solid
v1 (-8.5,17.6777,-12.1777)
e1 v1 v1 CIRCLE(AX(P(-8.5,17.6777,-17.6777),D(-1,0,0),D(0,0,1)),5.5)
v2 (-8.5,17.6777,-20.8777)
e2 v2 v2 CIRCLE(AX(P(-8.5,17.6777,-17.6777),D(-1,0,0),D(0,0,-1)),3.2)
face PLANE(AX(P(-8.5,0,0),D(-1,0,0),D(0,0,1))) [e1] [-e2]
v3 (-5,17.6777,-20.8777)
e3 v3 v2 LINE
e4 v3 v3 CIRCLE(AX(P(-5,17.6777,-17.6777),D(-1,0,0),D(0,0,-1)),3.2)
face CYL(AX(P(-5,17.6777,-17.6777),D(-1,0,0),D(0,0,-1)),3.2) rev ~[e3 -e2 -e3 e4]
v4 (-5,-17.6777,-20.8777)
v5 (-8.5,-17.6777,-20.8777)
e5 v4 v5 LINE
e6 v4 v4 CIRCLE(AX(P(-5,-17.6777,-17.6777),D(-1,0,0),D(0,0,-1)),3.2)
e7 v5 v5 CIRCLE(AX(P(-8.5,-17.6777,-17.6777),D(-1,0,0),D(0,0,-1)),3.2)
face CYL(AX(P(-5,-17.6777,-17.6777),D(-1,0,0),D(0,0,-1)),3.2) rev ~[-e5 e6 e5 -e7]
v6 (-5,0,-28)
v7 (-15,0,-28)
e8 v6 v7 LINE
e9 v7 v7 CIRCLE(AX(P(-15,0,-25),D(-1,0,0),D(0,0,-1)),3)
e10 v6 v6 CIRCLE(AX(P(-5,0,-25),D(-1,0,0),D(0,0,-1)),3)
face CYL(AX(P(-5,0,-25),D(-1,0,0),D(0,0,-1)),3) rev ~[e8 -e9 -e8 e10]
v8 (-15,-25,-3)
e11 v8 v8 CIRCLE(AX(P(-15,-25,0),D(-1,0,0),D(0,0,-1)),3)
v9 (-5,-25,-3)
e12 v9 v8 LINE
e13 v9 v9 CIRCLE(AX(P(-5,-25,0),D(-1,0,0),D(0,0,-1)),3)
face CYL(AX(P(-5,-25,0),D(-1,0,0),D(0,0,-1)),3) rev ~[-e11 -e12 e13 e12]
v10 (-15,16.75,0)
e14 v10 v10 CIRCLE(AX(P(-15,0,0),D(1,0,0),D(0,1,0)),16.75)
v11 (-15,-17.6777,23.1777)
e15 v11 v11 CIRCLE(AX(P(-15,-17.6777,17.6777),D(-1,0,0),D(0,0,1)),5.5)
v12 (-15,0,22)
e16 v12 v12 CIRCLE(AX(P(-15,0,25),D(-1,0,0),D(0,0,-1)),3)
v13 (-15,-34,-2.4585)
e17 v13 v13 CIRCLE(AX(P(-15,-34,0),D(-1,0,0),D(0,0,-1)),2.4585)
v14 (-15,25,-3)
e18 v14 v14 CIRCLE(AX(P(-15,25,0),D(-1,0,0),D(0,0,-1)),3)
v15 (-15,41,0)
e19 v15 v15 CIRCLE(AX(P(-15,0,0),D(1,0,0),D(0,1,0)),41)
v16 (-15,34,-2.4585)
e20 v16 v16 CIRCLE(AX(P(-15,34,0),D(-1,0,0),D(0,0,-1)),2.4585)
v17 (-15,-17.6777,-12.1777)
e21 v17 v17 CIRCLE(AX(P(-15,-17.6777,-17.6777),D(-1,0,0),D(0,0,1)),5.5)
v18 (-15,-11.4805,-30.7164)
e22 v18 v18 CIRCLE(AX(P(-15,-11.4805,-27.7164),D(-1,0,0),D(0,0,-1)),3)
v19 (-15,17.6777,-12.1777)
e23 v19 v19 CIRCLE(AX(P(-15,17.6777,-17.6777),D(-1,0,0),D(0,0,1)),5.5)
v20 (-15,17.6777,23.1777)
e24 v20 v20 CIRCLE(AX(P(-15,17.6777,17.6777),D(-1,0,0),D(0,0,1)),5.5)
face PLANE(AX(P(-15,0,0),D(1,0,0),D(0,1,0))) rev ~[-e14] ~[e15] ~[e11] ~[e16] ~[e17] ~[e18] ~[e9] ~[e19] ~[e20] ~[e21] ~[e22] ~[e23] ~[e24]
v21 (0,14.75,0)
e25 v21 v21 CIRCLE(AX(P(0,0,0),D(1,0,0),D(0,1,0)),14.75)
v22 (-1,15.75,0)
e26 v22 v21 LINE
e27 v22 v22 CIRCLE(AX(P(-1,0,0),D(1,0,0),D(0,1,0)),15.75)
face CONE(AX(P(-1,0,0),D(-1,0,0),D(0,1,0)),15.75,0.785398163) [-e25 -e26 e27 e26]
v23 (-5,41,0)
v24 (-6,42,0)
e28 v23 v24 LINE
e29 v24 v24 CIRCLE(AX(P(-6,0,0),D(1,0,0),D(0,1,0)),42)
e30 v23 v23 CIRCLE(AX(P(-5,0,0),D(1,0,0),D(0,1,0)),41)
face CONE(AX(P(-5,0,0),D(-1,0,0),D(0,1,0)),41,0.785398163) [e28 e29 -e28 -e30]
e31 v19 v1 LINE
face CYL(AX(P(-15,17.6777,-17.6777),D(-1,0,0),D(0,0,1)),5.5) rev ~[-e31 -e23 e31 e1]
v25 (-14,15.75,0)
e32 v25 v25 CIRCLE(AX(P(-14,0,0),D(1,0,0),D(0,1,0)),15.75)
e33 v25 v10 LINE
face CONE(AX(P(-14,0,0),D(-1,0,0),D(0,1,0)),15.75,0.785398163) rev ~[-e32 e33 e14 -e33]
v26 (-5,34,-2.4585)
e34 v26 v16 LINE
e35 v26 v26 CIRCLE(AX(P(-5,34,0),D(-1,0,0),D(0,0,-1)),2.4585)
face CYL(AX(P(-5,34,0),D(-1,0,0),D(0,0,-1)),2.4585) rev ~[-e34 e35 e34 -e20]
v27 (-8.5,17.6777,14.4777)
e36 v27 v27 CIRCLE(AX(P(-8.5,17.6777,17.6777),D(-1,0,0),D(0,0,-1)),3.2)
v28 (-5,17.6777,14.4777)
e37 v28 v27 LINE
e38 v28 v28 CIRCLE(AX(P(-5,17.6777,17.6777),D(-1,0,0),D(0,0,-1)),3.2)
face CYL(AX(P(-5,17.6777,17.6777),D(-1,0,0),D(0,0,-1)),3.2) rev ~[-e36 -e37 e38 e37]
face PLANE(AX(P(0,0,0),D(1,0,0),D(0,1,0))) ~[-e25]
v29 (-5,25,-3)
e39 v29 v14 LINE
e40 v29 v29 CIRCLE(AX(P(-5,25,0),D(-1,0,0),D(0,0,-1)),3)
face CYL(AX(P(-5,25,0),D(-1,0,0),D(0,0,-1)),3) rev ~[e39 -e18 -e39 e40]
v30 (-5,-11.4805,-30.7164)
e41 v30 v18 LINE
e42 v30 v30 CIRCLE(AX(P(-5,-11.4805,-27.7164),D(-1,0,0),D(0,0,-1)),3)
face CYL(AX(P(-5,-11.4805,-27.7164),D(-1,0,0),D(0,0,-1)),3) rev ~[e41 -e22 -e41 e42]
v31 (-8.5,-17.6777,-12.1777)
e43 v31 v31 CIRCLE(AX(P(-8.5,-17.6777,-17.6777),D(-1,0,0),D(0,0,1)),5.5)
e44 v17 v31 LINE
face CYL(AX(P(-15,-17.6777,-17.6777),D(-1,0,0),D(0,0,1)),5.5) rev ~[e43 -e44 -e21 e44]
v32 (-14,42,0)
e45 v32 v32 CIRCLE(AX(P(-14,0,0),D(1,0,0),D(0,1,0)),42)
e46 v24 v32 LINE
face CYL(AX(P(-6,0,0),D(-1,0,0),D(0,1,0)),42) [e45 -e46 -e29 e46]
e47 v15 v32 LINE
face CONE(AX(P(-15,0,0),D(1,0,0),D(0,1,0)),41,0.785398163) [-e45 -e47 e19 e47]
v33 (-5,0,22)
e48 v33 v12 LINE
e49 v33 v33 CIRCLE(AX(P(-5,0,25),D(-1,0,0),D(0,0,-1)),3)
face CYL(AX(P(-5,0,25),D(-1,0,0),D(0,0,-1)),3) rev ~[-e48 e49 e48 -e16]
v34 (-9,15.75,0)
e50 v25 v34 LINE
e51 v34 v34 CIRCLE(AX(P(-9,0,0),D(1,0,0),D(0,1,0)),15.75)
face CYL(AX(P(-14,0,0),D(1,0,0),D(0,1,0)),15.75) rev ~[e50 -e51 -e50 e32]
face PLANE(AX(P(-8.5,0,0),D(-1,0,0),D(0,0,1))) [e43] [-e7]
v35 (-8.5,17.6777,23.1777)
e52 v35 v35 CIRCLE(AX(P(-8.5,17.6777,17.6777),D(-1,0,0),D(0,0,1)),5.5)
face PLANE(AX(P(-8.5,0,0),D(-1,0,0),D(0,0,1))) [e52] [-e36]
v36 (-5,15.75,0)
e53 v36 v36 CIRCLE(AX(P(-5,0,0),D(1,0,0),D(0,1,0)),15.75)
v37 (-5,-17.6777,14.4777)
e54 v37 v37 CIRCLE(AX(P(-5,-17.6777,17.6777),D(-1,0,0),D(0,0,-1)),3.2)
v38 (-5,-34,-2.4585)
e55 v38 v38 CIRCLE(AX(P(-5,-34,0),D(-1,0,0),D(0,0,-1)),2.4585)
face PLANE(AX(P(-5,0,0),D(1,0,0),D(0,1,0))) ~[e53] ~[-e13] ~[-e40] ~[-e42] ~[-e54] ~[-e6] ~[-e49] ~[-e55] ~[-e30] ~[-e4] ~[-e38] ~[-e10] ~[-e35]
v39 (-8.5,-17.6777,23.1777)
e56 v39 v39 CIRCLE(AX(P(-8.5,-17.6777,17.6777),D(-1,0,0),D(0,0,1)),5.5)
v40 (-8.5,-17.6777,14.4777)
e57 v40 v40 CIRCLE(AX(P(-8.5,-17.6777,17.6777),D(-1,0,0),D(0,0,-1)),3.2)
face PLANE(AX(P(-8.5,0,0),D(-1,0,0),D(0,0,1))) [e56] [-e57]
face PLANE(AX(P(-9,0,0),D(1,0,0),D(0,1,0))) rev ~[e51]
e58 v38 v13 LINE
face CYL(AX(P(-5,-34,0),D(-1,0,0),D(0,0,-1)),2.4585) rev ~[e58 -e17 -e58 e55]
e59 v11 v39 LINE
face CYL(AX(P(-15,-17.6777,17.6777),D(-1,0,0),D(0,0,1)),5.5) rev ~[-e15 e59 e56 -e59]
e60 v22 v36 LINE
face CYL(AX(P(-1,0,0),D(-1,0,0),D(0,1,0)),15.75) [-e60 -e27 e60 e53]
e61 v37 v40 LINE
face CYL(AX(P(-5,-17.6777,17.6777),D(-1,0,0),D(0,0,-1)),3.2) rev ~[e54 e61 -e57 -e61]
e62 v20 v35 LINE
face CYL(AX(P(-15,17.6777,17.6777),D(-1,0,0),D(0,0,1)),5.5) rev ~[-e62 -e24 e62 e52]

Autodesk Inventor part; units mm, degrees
ref_plane "YZ Plane" through (0, 0, 0) normal (1, 0, 0) x (0, 1, 0)
ref_plane "XZ Plane" through (0, 0, 0) normal (0, 1, 0) x (-1, 0, 0)
ref_plane "XY Plane" through (0, 0, 0) normal (0, 0, 1) x (1, 0, 0)
sketch "Sketch1" plane through (0, 0, 0) normal (0, 0, 1) x (1, 0, 0)
  line L0 (-15, 41) -> (-15, 16.75)
  line L1 (-14, 15.75) -> (-9, 15.75)
  line L2 (-9, 15.75) -> (-9, 0)
  line L3 (-9, 0) -> (0, 0)
  line L4 (0, 0) -> (0, 14.75)
  line L5 (-1, 15.75) -> (-5, 15.75)
  line L6 (-5, 15.75) -> (-5, 41)
  line L7 (-6, 42) -> (-14, 42)
  line L8 (-5, 41) -> (-6, 42)
  line L9 (-15, 41) -> (-14, 42)
  line L10 (-14, 15.75) -> (-15, 16.75)
  line L11 (-1, 15.75) -> (0, 14.75)
  point P0 (-15, 42)
  point P1 (-15, 15.75)
  point P2 (0, 15.75)
  point P3 (-5, 42)
  point P4 (0, 7.375)
  point P5 (-4.5, 0)
  point P6 (-10, 42)
  point P7 (-11.5, 15.75)
  dimension "d1" = 6
  dimension "d2" = 15.75
  dimension "d3" = 5
  dimension "d4" = 15
  dimension "d5" = 1
  dimension "d6" = 1
  dimension "d7" = 1
  dimension "d8" = 1
  dimension "d9" = 1
  dimension "d10" = 1
  dimension "d11" = 1
  dimension "d12" = 1
  dimension "d13" = 42
  dimension "d14" = 15.75
revolve "Revolution1" add sketch "Sketch1" angle 360 about axis through (-9, 0, 0) along (1, 0, 0)
sketch "Sketch2" plane through (-5, 0, 0) normal (1, 0, 0) x (0, 0, -1)
  circle A0 centre (0, 0) radius 34
  circle A1 centre (0, 0) radius 30
  circle A2 centre (0, 0) radius 25
  circle A3 centre (0, 34) radius 2.5
  line L0 (0, 0) -> (42, 0)
  circle A4 centre (0, 0) radius 42 projected
  line L1 (27.7164, -11.4805) -> (0, 0)
  point P0 (0, -34)
  point P1 (0, 25)
  point P2 (0, -25)
  point P3 (-25, 0)
  point P4 (25, 0)
  point P5 (-17.6777, 17.6777)
  point P6 (17.6777, -17.6777)
  point P7 (-17.6777, -17.6777)
  point P8 (17.6777, 17.6777)
  dimension "d16" = 68
  dimension "d17" = 60
  dimension "d18" = 50
  dimension "d19" = 5
  dimension "d22" = 360
  dimension "d55" = -22.5
hole "Hole1" at (-5, 34, 0) at (-5, -34, 0) direction (-1, 0, 0) diameter 4.917 depth 10 thread size "M6x1" class "6H" standard "ISO Metric profile"
hole "Hole2" at (-5, 25, 0) at (-5, 0, -25) at (-5, -25, 0) at (-5, 0, 25) direction (-1, 0, 0) diameter 6 end up to surface
hole "Hole3" at (-5, 17.6777, -17.6777) at (-5, -17.6777, -17.6777) at (-5, -17.6777, 17.6777) at (-5, 17.6777, 17.6777) direction (-1, 0, 0) diameter 6.4 end up to surface
hole "Hole5" at (-5, -11.4805, -27.7164) direction (-1, 0, 0) diameter 6 end up to surface
sketch "Sketch4" plane through (-15, 0, 0) normal (-1, 0, 0) x (0, 0, 1)
  circle A0 centre (-17.6777, 17.6777) radius 3.2 projected
  circle A1 centre (-17.6777, 17.6777) radius 5.5
  circle A2 centre (-17.6777, -17.6777) radius 5.5
  circle A3 centre (17.6777, -17.6777) radius 5.5
  circle A4 centre (17.6777, 17.6777) radius 5.5
  point P0 (0, 0)
  dimension "d63" = 11
  dimension "d66" = 360
extrude "Extrusion1" cut sketch "Sketch4" against normal blind 6.5 contours A0 | A1 | A2 | A3 | A4
equation "\"d6\" = d5"
equation "\"d7\" = d5"
equation "\"d8\" = d7"
equation "\"d9\" = d5"
equation "\"d10\" = d9"
equation "\"d11\" = d5"
equation "\"d12\" = d11"
properties part number "UR5 Gripper Interface plate" material "Aluminum 6061"
